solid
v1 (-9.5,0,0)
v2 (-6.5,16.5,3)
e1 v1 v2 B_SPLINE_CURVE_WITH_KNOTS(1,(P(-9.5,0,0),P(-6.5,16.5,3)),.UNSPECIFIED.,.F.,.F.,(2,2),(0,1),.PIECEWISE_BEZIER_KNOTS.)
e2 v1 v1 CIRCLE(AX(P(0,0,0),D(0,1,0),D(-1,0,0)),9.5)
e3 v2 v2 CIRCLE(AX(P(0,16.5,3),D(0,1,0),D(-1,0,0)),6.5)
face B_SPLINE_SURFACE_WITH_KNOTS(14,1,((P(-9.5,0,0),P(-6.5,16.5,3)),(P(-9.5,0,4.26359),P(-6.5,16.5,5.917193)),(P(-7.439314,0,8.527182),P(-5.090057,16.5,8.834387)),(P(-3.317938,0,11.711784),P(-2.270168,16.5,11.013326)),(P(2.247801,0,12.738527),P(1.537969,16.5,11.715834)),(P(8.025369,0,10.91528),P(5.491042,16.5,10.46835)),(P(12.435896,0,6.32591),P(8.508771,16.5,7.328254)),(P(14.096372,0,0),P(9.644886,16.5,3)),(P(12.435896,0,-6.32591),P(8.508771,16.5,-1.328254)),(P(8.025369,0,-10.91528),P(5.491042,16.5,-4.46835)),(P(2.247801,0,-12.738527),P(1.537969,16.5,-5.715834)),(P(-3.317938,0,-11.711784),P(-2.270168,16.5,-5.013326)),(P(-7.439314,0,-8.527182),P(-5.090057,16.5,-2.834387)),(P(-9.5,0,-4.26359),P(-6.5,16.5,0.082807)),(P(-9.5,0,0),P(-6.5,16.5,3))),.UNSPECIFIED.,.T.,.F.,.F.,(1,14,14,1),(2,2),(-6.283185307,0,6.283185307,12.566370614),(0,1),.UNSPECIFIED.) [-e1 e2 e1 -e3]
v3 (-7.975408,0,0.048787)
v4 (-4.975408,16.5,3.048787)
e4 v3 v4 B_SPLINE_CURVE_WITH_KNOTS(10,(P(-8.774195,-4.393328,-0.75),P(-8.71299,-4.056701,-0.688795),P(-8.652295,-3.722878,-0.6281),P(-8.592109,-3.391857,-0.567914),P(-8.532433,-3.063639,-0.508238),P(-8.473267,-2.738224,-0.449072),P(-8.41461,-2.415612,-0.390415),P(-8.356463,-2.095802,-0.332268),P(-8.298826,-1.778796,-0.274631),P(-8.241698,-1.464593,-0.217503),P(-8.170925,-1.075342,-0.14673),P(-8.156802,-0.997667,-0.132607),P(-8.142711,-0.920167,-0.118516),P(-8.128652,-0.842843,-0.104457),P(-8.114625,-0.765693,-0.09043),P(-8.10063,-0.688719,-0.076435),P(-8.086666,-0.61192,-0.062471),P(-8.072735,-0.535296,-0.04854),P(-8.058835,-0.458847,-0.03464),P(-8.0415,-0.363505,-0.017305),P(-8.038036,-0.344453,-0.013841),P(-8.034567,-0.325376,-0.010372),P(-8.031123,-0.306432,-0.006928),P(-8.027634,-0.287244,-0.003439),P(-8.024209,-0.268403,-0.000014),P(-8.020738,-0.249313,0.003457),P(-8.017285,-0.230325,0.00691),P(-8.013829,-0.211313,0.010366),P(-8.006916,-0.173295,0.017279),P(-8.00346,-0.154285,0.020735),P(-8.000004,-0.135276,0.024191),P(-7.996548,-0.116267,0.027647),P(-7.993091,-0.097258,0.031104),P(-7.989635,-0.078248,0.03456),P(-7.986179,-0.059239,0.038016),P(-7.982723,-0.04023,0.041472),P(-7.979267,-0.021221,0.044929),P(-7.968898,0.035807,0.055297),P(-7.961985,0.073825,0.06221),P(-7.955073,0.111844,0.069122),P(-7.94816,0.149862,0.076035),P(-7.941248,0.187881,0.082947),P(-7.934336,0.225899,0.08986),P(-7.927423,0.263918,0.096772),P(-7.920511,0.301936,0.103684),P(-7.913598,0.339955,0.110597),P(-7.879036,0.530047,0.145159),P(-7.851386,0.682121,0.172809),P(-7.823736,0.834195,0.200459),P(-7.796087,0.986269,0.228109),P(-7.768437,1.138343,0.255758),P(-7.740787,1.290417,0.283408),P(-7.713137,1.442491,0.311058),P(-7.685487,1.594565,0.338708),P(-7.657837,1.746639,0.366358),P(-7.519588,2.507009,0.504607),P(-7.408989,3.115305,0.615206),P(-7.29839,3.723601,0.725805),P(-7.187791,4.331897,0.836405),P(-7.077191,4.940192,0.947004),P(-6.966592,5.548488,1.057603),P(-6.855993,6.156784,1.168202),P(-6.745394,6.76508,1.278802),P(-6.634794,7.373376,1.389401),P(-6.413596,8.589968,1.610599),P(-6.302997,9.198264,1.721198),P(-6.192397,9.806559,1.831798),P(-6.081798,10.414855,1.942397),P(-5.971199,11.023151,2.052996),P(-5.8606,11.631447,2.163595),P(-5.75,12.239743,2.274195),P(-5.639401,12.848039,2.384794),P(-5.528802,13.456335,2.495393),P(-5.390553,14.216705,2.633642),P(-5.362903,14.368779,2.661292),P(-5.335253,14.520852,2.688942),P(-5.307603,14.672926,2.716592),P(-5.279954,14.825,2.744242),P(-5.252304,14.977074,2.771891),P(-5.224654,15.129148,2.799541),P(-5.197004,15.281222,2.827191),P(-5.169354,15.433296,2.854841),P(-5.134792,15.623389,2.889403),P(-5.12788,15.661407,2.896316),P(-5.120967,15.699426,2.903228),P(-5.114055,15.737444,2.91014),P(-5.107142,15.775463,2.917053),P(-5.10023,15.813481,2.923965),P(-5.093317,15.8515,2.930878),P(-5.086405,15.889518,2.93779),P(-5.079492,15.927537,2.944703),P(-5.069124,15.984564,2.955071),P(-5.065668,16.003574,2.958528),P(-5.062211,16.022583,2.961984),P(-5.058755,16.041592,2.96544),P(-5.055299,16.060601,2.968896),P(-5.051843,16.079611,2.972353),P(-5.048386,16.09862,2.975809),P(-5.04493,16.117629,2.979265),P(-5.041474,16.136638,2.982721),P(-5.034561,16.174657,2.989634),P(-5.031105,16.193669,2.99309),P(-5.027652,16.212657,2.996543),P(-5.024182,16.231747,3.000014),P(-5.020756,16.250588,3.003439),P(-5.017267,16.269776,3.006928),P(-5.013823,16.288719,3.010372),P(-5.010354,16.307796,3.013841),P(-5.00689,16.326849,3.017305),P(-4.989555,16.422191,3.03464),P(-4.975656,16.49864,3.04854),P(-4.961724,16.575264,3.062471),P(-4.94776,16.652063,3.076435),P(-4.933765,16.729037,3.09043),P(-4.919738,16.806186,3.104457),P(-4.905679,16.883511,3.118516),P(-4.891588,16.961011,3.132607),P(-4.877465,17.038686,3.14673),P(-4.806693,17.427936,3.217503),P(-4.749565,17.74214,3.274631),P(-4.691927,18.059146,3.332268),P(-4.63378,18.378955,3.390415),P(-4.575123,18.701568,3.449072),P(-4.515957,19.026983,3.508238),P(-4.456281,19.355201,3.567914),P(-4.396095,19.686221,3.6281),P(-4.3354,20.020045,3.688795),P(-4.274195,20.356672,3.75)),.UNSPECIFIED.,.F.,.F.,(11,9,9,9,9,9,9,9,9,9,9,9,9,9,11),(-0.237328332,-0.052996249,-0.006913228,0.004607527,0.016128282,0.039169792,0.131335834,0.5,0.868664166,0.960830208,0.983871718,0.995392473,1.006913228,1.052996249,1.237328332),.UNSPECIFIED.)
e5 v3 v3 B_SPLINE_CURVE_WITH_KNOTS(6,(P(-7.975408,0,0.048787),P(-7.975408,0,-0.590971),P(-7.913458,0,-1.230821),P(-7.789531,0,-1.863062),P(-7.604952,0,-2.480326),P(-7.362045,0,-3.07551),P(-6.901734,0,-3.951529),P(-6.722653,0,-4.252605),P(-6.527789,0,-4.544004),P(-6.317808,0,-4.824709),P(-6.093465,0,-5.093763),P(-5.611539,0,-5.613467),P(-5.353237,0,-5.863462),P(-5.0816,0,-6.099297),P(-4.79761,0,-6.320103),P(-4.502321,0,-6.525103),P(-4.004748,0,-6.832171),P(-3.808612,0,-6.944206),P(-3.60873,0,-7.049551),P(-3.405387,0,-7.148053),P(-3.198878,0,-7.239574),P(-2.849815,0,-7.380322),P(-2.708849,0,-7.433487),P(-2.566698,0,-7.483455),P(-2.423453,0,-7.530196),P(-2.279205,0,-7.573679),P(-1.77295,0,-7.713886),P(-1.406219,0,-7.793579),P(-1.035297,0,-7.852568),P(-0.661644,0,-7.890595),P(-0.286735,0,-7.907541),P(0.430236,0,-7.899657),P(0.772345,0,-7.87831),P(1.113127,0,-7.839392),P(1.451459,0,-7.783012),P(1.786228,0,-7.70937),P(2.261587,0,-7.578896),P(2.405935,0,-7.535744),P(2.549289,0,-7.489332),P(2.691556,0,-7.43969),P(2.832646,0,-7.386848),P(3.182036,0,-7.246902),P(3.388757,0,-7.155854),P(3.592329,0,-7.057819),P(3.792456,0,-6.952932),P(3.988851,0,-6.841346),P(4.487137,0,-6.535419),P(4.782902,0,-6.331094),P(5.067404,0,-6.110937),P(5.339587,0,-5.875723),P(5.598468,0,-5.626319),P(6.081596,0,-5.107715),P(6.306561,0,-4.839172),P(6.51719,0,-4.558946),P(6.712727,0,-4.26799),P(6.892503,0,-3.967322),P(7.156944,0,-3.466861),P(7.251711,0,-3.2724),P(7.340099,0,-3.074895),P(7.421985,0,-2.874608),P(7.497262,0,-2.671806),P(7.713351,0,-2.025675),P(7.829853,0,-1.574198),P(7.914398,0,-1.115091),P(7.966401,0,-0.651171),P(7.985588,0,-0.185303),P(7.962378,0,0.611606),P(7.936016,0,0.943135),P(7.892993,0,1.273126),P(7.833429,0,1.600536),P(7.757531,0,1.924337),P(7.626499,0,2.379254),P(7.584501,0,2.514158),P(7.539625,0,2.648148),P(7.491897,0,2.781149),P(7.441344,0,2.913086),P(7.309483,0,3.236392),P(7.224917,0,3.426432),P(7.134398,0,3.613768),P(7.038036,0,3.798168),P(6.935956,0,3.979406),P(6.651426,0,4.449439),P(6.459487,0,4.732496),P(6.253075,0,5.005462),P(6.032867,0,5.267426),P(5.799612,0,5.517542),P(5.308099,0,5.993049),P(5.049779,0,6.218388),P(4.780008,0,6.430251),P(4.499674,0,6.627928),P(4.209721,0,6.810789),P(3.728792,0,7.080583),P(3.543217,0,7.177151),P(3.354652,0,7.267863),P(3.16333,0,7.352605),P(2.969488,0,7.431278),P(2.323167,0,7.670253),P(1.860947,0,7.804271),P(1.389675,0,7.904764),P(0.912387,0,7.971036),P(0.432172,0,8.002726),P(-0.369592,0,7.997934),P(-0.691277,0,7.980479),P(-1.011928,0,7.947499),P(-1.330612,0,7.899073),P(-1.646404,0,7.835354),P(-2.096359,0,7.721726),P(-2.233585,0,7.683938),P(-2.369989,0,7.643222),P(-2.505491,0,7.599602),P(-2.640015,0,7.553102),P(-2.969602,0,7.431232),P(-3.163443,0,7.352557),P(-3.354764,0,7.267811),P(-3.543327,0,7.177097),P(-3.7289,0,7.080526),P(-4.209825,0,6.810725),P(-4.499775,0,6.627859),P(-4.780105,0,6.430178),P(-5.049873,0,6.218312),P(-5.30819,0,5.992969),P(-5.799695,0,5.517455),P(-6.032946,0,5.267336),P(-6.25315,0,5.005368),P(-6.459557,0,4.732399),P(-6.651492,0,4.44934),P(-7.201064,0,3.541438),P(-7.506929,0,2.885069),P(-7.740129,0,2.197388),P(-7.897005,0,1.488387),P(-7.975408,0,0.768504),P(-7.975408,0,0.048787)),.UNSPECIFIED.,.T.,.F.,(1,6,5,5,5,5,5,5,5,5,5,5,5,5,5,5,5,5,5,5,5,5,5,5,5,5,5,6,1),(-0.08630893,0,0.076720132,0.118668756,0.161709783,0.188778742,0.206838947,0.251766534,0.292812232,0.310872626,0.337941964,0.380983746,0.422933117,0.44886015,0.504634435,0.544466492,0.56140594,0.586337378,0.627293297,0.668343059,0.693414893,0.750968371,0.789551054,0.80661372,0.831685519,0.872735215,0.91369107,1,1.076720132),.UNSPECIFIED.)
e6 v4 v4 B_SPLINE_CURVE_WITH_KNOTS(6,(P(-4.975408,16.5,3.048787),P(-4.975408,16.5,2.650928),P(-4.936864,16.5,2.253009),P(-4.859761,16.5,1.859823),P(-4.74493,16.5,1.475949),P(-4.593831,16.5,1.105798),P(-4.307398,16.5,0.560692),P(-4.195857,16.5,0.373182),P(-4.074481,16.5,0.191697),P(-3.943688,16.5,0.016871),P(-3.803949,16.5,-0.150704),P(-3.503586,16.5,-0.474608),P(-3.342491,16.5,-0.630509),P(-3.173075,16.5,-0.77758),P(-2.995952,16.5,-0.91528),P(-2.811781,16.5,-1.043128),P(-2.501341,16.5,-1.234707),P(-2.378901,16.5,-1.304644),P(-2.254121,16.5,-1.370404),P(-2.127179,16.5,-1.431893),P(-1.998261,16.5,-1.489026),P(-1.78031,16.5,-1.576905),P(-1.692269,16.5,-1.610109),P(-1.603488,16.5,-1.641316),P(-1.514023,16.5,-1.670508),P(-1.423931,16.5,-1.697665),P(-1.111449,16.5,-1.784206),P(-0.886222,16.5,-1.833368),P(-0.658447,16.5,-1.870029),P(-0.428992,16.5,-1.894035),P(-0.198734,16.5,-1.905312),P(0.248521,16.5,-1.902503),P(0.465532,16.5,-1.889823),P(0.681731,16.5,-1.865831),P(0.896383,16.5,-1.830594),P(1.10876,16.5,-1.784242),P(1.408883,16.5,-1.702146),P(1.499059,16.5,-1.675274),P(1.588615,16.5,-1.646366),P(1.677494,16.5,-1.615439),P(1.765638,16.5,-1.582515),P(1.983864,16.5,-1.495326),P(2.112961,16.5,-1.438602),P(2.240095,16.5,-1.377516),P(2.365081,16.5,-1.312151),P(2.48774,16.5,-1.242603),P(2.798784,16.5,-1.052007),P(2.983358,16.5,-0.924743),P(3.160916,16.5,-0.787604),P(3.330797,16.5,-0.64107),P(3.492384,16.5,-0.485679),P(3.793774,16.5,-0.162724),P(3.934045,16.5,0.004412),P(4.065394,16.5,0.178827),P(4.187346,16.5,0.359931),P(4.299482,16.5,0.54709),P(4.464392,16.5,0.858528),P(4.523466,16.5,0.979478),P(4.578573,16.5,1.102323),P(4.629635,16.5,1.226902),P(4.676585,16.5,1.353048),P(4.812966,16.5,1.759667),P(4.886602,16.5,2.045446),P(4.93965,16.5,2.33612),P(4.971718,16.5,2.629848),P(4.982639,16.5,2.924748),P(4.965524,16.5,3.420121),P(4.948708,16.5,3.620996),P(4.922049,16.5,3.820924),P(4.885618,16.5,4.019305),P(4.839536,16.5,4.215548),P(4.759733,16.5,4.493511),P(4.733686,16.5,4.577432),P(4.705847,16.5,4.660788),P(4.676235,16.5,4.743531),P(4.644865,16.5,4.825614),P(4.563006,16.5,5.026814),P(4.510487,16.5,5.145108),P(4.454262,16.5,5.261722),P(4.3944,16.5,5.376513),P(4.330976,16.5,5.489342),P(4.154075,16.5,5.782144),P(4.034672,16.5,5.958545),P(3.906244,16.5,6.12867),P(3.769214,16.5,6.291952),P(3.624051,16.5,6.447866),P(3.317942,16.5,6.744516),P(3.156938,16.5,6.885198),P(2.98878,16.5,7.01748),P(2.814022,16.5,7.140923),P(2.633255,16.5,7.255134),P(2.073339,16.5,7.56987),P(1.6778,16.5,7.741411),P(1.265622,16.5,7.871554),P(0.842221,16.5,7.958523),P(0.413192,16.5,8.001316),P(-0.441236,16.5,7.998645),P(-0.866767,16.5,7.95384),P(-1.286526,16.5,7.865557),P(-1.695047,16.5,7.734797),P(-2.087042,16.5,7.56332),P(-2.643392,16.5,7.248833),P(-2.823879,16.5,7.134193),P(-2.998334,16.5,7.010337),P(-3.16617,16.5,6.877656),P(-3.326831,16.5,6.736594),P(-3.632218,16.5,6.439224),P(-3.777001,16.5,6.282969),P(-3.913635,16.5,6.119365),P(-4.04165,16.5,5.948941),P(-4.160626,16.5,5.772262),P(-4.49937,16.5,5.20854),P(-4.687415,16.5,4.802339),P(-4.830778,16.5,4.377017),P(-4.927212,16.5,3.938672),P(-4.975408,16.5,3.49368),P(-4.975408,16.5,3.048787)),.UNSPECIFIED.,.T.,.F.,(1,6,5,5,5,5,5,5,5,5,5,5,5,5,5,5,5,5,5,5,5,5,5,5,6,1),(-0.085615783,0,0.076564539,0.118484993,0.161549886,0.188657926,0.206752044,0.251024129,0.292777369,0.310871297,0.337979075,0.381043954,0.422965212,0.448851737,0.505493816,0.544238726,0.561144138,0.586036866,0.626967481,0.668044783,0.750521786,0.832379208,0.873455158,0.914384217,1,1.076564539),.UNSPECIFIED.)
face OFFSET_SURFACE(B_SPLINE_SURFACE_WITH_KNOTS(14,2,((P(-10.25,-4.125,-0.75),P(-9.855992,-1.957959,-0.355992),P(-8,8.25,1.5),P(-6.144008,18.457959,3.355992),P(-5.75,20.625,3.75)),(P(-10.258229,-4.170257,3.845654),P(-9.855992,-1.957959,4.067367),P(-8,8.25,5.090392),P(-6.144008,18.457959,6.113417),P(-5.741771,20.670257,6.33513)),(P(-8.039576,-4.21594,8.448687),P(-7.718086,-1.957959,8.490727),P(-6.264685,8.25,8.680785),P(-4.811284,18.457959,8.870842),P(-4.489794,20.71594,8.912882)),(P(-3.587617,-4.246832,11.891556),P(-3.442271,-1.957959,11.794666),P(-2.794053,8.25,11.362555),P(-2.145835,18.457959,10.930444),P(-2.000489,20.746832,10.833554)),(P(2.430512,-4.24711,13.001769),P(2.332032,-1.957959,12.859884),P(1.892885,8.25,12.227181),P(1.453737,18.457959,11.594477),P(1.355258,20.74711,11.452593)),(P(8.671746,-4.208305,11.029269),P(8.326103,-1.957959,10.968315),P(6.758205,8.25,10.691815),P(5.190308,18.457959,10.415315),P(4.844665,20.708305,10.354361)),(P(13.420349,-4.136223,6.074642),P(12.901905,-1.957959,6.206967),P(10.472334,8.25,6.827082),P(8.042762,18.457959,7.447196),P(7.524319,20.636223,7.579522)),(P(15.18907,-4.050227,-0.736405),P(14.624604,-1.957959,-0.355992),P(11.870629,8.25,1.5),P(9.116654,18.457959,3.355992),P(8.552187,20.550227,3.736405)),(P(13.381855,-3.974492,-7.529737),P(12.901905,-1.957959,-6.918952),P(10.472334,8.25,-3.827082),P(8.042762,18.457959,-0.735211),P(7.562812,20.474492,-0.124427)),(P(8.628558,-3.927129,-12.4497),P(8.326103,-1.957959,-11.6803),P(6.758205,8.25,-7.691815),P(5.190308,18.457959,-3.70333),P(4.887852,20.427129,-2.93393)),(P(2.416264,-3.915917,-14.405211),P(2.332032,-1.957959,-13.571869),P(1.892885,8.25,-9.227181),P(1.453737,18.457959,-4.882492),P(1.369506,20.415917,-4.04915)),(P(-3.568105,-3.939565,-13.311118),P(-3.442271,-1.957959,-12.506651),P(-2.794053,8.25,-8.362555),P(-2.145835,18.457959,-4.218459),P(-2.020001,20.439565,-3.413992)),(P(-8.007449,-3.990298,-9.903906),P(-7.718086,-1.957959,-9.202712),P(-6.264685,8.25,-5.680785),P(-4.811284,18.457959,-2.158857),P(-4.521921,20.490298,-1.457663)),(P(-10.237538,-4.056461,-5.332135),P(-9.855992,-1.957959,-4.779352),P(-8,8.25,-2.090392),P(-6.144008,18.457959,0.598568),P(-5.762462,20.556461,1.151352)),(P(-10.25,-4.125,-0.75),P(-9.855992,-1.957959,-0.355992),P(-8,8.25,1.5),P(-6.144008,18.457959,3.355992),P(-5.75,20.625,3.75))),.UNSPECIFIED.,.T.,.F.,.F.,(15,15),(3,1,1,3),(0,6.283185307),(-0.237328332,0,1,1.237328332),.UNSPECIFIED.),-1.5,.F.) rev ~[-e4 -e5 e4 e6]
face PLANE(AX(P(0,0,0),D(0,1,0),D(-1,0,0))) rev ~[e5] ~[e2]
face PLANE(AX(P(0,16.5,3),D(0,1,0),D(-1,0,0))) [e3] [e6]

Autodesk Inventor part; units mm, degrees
ref_plane "YZ Plane" through (0, 0, 0) normal (1, 0, 0) x (0, 1, 0)
ref_plane "XY Plane" through (0, 0, 0) normal (0, 0, 1) x (1, 0, 0)
sketch "Szkic6" plane through (0, 0, 0) normal (0, 1, 0) x (-1, 0, 0)
  circle A0 centre (0, 0) radius 9.5
  dimension "d33" = 19
ref_plane "Płaszczyzna konstrukcyjna1" through (0, 16.5, 0) normal (0, 1, 0) x (-1, 0, 0)
sketch "Szkic7" plane through (0, 16.5, 0) normal (0, 1, 0) x (-1, 0, 0)
  circle A0 centre (0, 3) radius 6.5
  line L0 (0, -20.3) -> (0, 20.3) construction
  circle A1 centre (0, 0) radius 9.5 construction
  dimension "d35" = 13
loft "Wyciągnięcie złożone1" add profiles "Szkic6", "Szkic7"
shell "Skorupa1" thickness 1.5 removed faces 2 at (-3.8014, 16.5, 4.721) at (-2.3703, 0, -2.0999)
equation "\"d33\" = OD1"
equation "\"d35\" = OD2"
equation "\"d52\" = THK"
equation "\"SzerokośćGięciaPodcięcia\" = Grubość"
equation "\"RozmiarPodcięciaNarożnika\" = 4 * Grubość"
equation "\"PromieńPrzejścia\" = PromieńGięcia"
equation "\"Rozmiar_promienia_Jacobiego\" = PromieńGięcia"
equation "\"Wielk_odstępu\" = Grubość"
equation "\"d2\" = PromieńGięcia"
equation "\"d23\" = PromieńGięcia"
equation "\"OD1\" = 19"
equation "\"OD2\" = 13"
equation "\"L\" = 16.5"
equation "\"THK\" = 1.5"
equation "\"d34\" = L"
equation "\"Grubość\" = 1.5"
equation "\"PromieńGięcia\" = 3"
properties part number "Redukcja asymetryczna Ø19x13x1,5 L=16,5" material "304"
